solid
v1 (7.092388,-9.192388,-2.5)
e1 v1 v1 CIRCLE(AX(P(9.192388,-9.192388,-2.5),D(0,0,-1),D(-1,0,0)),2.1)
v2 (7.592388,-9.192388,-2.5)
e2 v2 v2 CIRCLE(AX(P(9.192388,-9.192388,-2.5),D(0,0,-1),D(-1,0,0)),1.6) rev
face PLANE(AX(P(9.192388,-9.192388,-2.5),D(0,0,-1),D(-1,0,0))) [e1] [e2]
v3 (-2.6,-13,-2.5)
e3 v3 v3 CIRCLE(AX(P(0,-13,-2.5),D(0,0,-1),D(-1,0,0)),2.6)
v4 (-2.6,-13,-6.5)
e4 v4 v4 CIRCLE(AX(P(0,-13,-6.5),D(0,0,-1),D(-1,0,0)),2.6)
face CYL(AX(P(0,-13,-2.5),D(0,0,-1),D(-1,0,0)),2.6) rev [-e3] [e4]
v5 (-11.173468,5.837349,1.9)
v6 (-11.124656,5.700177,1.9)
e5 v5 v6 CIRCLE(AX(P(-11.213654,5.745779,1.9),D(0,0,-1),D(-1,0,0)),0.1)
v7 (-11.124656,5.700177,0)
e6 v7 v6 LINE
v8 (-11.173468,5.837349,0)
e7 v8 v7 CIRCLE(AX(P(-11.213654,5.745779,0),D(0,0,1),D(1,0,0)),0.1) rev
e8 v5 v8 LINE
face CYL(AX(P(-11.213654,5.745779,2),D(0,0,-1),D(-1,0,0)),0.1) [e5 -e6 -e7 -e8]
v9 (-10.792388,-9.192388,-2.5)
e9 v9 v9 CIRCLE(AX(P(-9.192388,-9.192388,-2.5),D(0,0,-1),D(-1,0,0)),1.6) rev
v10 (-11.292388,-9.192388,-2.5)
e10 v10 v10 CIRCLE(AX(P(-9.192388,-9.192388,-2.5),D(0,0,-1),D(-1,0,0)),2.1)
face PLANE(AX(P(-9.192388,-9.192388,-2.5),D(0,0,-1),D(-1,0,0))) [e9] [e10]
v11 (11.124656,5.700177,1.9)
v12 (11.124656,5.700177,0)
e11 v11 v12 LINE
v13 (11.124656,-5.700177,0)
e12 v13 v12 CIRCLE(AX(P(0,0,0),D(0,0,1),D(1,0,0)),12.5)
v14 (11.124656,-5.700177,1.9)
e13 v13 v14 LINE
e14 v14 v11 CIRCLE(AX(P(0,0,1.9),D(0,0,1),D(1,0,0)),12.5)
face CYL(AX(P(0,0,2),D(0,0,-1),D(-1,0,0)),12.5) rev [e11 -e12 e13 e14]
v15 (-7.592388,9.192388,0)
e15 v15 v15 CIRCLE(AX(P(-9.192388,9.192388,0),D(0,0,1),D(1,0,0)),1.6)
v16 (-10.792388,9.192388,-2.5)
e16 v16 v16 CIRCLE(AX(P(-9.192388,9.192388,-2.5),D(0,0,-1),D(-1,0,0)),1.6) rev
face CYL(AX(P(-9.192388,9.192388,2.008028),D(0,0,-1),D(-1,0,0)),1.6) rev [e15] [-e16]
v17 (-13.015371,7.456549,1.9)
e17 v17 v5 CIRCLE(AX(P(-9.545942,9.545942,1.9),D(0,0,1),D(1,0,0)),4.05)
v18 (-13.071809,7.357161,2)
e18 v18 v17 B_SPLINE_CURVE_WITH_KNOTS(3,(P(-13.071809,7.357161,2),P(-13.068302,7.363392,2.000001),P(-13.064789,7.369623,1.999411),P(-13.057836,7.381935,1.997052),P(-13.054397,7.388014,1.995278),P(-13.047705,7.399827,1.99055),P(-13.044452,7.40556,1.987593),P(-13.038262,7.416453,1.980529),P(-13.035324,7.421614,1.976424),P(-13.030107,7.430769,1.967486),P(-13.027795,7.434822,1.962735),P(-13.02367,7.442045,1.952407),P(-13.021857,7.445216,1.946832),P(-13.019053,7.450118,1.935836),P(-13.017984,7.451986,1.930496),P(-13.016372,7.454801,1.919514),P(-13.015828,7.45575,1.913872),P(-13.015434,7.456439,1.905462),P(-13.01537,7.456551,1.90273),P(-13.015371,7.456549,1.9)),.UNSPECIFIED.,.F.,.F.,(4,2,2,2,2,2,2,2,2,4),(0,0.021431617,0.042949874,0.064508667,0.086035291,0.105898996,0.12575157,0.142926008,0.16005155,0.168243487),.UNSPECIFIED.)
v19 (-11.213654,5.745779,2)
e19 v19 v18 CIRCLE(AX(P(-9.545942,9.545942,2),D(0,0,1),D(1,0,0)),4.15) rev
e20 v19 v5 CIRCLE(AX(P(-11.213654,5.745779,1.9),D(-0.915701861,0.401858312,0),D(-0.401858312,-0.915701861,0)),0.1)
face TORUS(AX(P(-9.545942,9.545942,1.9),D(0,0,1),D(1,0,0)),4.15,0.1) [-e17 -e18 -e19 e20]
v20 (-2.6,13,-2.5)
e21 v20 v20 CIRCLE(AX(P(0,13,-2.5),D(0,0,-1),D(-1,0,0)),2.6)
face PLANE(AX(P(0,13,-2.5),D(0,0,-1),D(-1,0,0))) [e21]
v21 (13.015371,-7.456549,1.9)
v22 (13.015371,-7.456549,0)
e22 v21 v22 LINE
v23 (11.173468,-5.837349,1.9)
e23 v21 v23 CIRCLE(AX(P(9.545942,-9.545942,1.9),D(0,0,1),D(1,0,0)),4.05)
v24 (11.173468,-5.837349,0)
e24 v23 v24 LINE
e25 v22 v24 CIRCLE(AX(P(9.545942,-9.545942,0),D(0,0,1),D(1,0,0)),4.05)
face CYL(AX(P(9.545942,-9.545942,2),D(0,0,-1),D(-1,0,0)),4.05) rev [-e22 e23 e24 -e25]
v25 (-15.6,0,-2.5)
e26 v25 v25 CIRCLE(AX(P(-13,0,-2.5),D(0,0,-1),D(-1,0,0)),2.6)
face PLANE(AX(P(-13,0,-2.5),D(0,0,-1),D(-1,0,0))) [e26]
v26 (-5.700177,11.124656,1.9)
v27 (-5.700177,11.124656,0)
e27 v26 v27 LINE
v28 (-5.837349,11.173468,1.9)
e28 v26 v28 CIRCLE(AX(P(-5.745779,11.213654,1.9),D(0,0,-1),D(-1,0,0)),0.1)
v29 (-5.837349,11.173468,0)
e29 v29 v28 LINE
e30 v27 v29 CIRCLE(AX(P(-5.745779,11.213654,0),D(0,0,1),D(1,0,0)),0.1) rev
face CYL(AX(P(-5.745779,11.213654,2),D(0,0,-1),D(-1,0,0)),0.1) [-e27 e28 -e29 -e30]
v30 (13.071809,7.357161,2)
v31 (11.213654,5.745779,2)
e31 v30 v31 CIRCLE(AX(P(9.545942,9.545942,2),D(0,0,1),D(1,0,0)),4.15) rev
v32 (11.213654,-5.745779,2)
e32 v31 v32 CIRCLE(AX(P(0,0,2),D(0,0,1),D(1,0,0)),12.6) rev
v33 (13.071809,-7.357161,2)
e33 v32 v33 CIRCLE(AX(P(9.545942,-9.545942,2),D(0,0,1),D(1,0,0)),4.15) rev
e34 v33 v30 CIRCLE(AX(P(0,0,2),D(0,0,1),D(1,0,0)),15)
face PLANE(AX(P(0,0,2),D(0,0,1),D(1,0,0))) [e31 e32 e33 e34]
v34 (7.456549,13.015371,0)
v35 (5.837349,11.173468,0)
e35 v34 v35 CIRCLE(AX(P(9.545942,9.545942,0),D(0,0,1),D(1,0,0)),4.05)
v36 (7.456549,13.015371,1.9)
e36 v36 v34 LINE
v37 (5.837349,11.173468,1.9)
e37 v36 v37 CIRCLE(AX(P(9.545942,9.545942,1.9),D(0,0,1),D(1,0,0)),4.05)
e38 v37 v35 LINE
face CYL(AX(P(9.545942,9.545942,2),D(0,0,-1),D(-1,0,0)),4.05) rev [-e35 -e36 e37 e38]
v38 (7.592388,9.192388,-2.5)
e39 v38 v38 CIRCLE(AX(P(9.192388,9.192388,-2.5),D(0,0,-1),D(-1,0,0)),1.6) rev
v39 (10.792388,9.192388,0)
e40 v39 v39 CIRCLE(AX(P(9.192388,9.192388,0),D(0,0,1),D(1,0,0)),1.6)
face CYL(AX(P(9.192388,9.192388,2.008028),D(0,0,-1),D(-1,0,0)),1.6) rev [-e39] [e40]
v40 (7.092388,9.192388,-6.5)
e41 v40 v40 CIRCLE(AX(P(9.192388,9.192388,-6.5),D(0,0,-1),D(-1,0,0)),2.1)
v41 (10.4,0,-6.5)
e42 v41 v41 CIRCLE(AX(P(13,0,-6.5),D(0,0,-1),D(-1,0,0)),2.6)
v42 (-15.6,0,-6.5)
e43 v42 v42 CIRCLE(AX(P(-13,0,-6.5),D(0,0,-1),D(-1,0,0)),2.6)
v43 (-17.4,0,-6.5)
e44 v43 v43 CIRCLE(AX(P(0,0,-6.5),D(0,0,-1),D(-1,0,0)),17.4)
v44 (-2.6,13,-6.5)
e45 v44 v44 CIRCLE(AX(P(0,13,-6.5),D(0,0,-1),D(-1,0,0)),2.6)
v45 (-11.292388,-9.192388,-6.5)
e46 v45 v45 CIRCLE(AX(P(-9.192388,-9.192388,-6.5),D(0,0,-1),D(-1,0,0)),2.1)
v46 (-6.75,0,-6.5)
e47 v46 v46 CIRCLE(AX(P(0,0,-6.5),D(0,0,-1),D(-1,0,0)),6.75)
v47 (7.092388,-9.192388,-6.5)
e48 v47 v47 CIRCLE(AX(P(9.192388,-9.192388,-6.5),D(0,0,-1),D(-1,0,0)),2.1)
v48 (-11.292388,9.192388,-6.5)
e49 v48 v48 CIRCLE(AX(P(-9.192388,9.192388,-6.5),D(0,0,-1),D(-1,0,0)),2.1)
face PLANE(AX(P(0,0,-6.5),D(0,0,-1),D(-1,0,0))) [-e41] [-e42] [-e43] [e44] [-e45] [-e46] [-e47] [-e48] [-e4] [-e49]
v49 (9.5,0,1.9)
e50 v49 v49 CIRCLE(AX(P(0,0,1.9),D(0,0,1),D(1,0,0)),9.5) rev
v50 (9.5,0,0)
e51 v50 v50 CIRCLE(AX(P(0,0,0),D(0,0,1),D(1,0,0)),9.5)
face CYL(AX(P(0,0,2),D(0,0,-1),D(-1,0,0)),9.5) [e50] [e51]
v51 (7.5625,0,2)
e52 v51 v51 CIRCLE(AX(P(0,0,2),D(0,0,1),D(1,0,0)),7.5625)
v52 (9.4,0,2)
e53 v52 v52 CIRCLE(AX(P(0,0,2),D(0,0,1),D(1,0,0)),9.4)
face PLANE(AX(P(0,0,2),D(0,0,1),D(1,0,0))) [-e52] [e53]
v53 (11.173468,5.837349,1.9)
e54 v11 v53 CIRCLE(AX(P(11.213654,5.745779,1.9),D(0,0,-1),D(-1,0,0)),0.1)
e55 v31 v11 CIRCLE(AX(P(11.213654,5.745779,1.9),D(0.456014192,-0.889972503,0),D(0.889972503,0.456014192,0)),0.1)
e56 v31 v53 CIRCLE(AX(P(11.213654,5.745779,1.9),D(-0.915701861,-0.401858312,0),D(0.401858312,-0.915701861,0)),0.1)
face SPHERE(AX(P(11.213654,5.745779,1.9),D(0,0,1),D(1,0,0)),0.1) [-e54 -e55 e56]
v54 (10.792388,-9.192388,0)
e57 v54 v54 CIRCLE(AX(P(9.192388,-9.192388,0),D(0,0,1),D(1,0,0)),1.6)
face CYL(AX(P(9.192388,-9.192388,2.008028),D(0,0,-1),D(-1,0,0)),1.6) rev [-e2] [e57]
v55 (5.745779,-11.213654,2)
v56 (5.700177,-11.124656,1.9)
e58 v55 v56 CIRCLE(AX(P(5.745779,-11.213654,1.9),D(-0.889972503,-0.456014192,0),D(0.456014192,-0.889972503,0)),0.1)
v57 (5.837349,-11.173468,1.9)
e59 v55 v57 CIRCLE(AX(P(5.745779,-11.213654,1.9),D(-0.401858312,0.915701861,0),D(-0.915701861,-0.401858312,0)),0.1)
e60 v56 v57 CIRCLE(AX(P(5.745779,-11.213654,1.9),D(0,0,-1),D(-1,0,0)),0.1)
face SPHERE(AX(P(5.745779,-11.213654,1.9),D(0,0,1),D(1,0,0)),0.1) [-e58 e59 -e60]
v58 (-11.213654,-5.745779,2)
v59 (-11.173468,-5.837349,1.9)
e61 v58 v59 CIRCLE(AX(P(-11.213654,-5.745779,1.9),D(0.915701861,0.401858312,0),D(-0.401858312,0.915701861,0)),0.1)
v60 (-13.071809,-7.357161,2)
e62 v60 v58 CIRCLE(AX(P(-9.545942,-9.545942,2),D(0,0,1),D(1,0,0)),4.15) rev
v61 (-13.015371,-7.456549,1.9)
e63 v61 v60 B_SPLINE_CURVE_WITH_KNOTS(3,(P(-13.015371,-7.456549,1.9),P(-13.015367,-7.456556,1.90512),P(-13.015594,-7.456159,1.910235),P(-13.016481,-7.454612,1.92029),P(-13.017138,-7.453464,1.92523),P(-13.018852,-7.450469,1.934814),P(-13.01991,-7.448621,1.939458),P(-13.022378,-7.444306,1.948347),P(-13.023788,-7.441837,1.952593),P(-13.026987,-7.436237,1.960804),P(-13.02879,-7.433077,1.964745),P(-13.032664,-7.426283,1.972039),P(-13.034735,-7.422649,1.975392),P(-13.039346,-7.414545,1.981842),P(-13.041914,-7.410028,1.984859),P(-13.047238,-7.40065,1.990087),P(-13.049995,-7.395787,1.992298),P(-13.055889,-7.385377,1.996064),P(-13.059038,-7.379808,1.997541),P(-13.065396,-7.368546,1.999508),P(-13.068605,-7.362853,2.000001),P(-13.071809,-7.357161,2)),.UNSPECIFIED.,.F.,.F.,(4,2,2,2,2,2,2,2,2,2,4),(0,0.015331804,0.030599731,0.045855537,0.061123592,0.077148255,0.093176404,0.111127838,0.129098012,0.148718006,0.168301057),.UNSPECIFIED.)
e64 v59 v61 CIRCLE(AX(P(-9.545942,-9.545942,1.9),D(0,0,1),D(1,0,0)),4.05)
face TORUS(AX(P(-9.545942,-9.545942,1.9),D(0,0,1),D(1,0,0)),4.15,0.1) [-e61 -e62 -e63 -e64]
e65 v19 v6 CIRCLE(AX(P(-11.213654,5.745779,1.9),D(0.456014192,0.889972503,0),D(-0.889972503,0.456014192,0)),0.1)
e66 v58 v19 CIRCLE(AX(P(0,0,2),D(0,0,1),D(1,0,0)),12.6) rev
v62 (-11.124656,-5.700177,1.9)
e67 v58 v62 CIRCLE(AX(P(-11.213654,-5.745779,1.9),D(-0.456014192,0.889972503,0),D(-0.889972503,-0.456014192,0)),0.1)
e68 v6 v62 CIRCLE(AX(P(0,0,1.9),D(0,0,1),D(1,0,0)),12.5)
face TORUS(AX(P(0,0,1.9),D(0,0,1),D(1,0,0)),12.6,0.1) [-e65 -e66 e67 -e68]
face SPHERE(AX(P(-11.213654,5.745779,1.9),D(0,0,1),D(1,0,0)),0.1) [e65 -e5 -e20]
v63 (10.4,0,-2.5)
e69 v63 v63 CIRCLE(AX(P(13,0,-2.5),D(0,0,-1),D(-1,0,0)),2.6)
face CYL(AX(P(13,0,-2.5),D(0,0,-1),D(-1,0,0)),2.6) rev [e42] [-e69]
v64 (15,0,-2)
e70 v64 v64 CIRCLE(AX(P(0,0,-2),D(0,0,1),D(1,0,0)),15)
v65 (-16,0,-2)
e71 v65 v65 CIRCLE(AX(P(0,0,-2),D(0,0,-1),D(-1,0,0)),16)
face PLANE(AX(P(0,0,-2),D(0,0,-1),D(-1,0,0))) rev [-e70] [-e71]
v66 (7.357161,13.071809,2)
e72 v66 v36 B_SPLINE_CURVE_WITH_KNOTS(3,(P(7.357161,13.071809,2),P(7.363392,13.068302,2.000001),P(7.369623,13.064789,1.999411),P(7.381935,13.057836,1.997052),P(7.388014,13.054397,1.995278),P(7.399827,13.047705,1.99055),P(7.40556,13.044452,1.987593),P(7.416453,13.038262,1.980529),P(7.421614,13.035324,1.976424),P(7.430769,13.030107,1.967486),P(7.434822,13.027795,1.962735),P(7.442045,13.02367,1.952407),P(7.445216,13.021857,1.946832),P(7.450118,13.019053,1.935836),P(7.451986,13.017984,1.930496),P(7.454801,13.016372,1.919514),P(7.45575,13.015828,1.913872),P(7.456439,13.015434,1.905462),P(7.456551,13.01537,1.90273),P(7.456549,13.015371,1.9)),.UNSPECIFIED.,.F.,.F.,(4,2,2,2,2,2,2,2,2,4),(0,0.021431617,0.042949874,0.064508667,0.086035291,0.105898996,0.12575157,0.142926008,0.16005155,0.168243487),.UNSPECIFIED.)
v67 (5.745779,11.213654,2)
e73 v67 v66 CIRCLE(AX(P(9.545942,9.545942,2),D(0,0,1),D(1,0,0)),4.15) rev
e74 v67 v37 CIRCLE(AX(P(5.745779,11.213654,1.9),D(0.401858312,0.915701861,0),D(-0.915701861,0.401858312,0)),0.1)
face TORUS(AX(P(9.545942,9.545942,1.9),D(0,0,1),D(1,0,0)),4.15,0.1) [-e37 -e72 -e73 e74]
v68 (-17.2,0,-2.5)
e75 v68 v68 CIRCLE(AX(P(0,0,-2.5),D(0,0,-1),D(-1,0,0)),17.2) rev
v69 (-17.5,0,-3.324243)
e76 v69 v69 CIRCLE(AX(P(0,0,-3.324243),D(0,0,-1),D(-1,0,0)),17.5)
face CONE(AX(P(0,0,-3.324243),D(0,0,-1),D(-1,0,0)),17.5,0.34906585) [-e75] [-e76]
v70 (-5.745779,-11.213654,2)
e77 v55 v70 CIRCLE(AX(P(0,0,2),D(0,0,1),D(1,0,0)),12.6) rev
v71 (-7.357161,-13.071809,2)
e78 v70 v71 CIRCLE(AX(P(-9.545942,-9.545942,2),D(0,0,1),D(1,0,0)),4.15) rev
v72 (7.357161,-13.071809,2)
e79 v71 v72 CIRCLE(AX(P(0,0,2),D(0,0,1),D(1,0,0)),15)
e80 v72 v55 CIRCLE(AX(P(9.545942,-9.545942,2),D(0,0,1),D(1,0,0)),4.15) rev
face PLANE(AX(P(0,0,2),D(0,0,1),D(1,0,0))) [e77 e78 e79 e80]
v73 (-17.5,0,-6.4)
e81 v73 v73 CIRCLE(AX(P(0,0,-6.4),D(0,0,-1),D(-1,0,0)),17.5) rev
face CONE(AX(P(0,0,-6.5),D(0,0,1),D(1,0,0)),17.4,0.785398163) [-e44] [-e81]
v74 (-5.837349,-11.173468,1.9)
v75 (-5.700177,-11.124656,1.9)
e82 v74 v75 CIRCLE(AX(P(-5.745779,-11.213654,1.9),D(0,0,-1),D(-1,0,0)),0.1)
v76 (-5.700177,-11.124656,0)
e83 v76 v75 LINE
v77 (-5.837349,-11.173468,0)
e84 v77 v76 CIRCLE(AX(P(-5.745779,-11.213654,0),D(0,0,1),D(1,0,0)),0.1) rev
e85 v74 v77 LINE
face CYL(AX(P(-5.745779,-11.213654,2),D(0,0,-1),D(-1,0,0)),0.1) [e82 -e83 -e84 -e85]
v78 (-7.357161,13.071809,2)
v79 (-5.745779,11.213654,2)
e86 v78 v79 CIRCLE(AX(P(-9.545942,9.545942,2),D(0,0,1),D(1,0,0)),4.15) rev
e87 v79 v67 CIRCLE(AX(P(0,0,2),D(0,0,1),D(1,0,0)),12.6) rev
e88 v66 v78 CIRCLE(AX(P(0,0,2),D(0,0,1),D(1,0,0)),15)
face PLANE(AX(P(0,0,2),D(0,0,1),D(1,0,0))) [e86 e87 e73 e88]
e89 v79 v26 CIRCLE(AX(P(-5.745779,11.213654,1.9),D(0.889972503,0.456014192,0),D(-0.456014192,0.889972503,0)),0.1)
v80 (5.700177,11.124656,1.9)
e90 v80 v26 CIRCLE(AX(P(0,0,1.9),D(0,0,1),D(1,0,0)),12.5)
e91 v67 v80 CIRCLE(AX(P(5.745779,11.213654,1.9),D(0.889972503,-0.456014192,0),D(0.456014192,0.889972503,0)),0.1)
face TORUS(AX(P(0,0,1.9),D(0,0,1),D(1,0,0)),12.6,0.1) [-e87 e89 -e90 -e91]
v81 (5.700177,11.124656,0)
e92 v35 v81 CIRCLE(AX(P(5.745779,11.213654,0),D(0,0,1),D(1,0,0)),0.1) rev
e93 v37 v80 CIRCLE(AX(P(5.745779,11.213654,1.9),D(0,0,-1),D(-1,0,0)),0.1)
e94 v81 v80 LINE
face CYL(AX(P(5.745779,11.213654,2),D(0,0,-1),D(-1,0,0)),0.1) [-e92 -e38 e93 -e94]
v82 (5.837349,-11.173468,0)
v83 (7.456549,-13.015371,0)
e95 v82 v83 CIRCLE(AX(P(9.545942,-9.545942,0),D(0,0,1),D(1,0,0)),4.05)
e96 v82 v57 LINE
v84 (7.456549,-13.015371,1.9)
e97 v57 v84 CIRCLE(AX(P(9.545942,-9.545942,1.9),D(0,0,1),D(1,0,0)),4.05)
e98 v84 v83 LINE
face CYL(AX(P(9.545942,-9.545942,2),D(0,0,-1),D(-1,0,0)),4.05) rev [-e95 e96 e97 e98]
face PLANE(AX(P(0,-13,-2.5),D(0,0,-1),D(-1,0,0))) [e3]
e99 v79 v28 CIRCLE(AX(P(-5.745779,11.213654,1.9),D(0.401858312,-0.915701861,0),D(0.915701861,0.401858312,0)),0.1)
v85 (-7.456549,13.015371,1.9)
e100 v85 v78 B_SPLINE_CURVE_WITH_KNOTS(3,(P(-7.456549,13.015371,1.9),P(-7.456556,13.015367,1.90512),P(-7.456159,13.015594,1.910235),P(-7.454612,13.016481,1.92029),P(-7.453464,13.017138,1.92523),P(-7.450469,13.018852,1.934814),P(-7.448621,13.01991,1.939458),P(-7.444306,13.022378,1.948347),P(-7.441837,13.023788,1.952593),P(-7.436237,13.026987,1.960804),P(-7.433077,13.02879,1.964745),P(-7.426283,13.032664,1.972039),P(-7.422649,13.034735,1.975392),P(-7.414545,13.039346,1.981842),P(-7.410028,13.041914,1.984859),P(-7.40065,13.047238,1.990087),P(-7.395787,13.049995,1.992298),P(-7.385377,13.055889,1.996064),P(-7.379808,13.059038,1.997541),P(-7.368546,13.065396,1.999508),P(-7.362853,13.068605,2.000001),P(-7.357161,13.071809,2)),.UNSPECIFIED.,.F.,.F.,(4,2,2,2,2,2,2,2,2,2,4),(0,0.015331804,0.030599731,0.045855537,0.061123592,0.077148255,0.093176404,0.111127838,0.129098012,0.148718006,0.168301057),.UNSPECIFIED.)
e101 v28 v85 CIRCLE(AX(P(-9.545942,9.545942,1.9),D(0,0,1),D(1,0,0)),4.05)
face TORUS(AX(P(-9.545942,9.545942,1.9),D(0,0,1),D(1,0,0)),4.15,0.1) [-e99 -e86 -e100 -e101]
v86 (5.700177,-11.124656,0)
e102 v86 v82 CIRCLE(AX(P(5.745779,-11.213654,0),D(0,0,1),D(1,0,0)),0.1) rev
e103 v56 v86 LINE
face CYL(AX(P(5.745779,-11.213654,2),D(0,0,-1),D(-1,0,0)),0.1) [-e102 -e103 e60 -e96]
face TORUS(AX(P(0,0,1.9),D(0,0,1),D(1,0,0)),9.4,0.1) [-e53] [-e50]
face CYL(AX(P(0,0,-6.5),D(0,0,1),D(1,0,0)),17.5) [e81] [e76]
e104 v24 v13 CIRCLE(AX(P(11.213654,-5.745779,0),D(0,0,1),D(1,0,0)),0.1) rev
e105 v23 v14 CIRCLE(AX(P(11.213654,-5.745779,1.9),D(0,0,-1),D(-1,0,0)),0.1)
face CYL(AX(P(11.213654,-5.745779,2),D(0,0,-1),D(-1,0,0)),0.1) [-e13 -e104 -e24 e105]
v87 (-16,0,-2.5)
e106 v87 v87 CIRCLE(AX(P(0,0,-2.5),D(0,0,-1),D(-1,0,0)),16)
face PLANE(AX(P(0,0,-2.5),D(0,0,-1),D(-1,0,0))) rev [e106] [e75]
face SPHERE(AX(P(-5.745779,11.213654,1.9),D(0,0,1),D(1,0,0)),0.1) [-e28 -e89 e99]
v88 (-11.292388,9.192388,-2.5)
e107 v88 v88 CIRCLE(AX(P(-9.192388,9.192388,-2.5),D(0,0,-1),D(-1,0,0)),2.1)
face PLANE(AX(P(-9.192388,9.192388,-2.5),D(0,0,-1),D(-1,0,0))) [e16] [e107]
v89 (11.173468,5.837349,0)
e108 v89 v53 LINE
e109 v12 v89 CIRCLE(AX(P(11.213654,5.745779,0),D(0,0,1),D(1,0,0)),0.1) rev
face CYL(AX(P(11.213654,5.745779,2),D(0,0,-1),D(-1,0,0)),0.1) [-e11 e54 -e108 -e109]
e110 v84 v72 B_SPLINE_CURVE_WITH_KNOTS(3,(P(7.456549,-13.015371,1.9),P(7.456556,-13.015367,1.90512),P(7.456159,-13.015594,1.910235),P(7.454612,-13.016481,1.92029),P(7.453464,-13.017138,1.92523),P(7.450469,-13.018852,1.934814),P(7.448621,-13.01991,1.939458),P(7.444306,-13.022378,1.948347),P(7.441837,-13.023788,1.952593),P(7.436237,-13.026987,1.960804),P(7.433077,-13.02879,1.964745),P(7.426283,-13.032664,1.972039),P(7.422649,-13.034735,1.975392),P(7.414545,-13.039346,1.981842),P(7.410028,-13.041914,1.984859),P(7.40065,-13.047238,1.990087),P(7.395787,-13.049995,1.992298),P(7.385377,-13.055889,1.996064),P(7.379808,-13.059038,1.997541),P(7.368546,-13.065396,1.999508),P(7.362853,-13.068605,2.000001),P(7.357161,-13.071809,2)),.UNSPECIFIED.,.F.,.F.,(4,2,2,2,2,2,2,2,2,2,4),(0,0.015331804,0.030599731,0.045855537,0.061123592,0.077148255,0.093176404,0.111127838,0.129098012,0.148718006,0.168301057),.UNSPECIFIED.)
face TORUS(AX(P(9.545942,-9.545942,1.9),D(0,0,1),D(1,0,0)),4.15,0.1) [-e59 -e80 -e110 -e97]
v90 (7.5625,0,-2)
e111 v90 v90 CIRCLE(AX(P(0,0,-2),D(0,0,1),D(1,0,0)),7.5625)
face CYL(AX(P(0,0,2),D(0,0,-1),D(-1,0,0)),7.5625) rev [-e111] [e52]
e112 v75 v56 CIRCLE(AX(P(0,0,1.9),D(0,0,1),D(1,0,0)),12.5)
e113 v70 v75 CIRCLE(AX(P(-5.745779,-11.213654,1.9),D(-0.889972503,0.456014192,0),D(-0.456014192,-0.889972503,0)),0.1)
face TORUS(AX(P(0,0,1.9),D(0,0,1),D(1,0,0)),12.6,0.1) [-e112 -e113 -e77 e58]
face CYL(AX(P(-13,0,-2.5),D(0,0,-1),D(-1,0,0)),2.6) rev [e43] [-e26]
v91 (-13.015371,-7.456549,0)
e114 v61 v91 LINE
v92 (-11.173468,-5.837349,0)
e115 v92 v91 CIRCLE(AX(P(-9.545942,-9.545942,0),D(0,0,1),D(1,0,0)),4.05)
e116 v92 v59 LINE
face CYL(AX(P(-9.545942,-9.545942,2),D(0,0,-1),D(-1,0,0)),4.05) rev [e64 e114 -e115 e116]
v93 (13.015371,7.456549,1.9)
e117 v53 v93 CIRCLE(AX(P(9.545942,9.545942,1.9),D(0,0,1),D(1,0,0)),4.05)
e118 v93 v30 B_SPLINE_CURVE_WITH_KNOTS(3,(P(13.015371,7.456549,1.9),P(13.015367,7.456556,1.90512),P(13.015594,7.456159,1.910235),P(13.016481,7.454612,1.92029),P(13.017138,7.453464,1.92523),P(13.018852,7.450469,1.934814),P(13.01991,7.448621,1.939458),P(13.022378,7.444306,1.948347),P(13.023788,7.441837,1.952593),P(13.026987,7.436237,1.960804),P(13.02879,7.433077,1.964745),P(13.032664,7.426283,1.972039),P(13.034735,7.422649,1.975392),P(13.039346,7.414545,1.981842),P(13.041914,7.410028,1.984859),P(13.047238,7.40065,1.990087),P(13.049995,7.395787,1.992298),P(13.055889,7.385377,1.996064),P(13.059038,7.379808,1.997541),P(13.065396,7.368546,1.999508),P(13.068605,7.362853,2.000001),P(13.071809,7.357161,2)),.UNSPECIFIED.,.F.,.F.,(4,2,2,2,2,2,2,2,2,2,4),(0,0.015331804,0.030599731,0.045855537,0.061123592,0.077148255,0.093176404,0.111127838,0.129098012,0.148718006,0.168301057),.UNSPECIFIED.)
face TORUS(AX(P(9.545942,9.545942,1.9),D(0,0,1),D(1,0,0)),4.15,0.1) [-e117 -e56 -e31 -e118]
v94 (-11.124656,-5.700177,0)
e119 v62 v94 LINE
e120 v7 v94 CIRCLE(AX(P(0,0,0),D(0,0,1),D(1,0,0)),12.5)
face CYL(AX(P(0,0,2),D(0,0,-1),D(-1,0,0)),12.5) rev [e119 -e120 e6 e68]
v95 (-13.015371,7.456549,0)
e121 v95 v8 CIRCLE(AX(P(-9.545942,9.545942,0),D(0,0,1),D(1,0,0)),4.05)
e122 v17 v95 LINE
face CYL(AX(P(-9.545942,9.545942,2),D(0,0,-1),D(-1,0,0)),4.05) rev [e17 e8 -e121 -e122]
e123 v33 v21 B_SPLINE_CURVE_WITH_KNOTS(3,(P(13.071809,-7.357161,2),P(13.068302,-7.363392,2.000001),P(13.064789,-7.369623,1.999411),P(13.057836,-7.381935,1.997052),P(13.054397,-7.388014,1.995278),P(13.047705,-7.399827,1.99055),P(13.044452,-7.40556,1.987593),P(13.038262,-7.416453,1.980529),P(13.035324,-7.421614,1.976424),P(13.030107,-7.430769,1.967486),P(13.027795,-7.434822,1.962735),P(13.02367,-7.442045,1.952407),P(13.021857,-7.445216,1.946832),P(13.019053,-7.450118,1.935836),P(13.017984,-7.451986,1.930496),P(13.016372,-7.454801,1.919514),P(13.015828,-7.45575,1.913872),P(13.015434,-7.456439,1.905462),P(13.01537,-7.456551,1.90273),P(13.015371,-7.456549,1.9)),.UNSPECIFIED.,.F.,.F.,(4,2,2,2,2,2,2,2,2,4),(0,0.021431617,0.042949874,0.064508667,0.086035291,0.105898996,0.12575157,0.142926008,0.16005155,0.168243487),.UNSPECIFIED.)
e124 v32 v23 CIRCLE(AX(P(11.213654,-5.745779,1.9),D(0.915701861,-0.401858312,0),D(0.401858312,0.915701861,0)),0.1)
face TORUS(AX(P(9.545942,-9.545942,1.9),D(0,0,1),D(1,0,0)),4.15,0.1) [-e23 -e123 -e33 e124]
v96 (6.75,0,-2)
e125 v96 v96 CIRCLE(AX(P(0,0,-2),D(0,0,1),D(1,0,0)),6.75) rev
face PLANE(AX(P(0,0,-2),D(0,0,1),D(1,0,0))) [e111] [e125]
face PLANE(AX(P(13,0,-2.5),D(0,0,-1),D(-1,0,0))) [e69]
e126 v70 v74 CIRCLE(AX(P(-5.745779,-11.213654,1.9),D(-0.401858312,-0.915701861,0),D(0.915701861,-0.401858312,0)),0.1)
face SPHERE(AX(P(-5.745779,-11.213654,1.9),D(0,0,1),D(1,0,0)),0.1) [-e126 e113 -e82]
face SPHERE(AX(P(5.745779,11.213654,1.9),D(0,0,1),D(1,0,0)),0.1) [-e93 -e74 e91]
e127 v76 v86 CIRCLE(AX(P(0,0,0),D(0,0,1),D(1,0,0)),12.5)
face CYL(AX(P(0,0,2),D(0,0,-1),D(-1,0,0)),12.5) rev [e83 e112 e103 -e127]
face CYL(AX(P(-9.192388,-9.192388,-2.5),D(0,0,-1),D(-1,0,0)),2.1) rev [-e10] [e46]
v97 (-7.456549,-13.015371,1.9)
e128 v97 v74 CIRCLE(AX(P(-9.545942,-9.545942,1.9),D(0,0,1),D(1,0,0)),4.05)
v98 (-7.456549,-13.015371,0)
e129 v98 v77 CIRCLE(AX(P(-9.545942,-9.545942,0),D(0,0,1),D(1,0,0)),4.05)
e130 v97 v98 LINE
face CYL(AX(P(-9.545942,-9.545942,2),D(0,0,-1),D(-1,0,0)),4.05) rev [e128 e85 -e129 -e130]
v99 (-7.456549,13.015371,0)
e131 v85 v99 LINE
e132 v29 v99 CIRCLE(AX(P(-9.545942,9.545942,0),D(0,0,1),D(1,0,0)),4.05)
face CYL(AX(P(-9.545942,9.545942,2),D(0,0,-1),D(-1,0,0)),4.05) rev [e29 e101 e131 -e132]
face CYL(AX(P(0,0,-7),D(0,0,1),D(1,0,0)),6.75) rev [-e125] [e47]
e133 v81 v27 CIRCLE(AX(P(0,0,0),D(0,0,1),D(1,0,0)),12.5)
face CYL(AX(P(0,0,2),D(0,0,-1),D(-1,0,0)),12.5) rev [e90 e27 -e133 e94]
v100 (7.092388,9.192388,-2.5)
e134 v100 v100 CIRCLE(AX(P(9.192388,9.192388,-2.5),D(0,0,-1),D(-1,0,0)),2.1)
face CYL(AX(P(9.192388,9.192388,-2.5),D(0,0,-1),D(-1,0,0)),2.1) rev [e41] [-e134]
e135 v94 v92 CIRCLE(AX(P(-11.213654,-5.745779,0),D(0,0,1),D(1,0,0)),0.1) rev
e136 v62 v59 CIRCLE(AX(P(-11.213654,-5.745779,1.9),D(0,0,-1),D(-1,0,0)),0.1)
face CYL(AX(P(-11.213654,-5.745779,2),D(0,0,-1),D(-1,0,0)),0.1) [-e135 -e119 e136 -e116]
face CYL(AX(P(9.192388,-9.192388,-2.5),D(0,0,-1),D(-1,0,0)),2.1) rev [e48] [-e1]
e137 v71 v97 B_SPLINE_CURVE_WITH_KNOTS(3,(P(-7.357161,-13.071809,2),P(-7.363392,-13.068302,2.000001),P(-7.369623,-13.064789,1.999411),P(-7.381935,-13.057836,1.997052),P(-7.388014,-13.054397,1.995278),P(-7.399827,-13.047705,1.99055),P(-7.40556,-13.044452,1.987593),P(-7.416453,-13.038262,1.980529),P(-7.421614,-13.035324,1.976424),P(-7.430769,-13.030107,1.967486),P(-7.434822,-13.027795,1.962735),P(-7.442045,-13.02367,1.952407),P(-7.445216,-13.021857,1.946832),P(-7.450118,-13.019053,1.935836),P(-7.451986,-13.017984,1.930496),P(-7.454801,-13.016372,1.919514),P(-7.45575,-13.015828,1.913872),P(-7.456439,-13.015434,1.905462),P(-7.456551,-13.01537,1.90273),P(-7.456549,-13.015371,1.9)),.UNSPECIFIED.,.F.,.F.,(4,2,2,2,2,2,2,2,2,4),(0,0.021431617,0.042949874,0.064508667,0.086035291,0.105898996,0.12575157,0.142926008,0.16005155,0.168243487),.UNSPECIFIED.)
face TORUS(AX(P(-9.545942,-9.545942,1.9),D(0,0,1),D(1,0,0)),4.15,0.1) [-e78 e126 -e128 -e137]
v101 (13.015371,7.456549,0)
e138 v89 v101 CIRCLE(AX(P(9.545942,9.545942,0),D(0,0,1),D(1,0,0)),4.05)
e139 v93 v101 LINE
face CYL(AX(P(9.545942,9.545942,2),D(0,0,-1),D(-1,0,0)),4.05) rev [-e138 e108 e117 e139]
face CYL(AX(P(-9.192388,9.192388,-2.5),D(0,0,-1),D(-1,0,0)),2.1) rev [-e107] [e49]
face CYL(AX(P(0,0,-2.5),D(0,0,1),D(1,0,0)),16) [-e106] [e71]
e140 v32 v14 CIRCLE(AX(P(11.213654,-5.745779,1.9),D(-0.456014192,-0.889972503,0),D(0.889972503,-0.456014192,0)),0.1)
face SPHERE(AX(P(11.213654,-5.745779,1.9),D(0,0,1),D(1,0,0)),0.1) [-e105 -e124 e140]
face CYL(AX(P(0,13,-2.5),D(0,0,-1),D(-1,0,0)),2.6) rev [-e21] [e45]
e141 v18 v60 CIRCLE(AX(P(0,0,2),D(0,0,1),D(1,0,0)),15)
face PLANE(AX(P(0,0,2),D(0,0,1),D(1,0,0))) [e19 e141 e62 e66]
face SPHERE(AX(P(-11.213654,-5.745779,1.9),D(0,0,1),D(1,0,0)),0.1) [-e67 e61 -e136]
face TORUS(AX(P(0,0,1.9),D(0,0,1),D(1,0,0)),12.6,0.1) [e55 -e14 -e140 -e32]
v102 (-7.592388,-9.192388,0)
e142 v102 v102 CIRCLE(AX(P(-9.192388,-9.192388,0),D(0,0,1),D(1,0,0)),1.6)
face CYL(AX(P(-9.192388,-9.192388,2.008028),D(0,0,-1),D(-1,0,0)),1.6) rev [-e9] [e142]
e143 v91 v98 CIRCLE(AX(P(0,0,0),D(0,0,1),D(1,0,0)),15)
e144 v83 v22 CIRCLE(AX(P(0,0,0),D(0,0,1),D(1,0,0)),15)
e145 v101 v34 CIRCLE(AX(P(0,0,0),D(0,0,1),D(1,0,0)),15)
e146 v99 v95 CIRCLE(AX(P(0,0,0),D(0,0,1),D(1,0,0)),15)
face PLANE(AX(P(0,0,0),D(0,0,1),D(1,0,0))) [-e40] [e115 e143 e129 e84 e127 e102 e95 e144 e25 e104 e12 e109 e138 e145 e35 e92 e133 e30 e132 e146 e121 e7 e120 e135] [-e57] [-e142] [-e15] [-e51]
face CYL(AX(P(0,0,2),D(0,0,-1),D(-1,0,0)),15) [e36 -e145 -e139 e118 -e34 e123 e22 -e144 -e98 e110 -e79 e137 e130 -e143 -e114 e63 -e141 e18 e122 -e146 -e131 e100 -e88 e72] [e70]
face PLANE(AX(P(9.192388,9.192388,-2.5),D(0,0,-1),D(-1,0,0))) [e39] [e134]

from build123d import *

# Parameters (mm, degrees)
BOSS_EXTRUDE1_DEPTH     = 2
BOSS_EXTRUDE1_2_DEPTH   = 2
BOSS_EXTRUDE1_3_DEPTH   = 2
BOSS_EXTRUDE1_4_DEPTH   = 2
SKETCH1_R               = 9.5
SKETCH1_R_2             = 7.5625
BOSS_EXTRUDE1_5_DEPTH   = 2
BOSS_EXTRUDE2_START     = -2
SKETCH2_R               = 15
BOSS_EXTRUDE2_DEPTH     = 2
FILLET1_R               = 0.1
FILLET2_R               = 0.1
SKETCH4_R               = 16
BOSS_EXTRUDE3_DEPTH     = 0.5
SKETCH5_R               = 17.5
BOSS_EXTRUDE4_DEPTH     = 4
CUT_EXTRUDE2_DEPTH      = 26.154522456
CUT_EXTRUDE2_DEPTH_BACK = 26.154522456
SKETCH3_R               = 1.6
SKETCH6_R               = 2.1
CUT_EXTRUDE3_DEPTH      = 4
SKETCH7_R               = 2.6
CUT_EXTRUDE4_DEPTH      = 4
SKETCH8_R               = 6.75
MIDDLE_CUTOUT_DEPTH     = 7
CHAMFER1_SIZE           = 0.1
CUT_EXTRUDE6_START      = -2
SKETCH9_R               = 7.5625
CUT_EXTRUDE6_DEPTH      = 2
CHAMFER2_SIZE           = 0.3
CHAMFER2_SIZE2          = 0.824243226


with BuildPart() as part:
    # Sketch1 → Boss-Extrude1 (new body)
    with BuildSketch(Plane.XY):
        with BuildLine():
            ThreePointArc((5.795745748, 11.075167323), (6.469207051, 12.179609111), (7.456549067, 13.01537076))
            ThreePointArc((7.456549067, 13.01537076), (0, 15), (-7.456549067, 13.01537076))
            ThreePointArc((-7.456549067, 13.01537076), (-6.469207051, 12.179609111), (-5.795745748, 11.075167323))
            ThreePointArc((-5.795745748, 11.075167323), (0, 12.5), (5.795745748, 11.075167323))
        make_face()
    extrude(amount=BOSS_EXTRUDE1_DEPTH)



with BuildPart() as body_2:
    # Sketch1 → Boss-Extrude1 2 (new body)
    with BuildSketch(Plane.XY):
        with BuildLine():
            ThreePointArc((13.01537076, -7.456549067), (14.495353762, -3.858071967), (15, 0))
            ThreePointArc((15, 0), (14.495353762, 3.858071967), (13.01537076, 7.456549067))
            ThreePointArc((13.01537076, 7.456549067), (12.179609111, 6.469207051), (11.075167323, 5.795745748))
            ThreePointArc((11.075167323, 5.795745748), (12.5, 0), (11.075167323, -5.795745748))
            ThreePointArc((11.075167323, -5.795745748), (12.179609111, -6.469207051), (13.01537076, -7.456549067))
        make_face()
    extrude(amount=BOSS_EXTRUDE1_2_DEPTH)


with BuildPart() as body_3:
    # Sketch1 → Boss-Extrude1 3 (new body)
    with BuildSketch(Plane.XY):
        with BuildLine():
            ThreePointArc((-7.456549067, -13.01537076), (0, -15), (7.456549067, -13.01537076))
            ThreePointArc((7.456549067, -13.01537076), (6.469207051, -12.179609111), (5.795745748, -11.075167323))
            ThreePointArc((5.795745748, -11.075167323), (0, -12.5), (-5.795745748, -11.075167323))
            ThreePointArc((-5.795745748, -11.075167323), (-6.469207051, -12.179609111), (-7.456549067, -13.01537076))
        make_face()
    extrude(amount=BOSS_EXTRUDE1_3_DEPTH)


with BuildPart() as body_4:
    # Sketch1 → Boss-Extrude1 4 (new body)
    with BuildSketch(Plane.XY):
        with BuildLine():
            ThreePointArc((-11.075167323, 5.795745748), (-12.179609111, 6.469207051), (-13.01537076, 7.456549067))
            ThreePointArc((-13.01537076, 7.456549067), (-15, 0), (-13.01537076, -7.456549067))
            ThreePointArc((-13.01537076, -7.456549067), (-12.179609111, -6.469207051), (-11.075167323, -5.795745748))
            ThreePointArc((-11.075167323, -5.795745748), (-12.5, 0), (-11.075167323, 5.795745748))
        make_face()
    extrude(amount=BOSS_EXTRUDE1_4_DEPTH)


with BuildPart() as body_5:
    # Sketch1 → Boss-Extrude1 5 (new body)
    with BuildSketch(Plane.XY):
        Circle(SKETCH1_R)
        Circle(SKETCH1_R_2, mode=Mode.SUBTRACT)
    extrude(amount=BOSS_EXTRUDE1_5_DEPTH)


with BuildPart() as part_1:
    add(part.part)

    add(body_2.part)  # Boss-Extrude2 merges body 2

    add(body_3.part)  # Boss-Extrude2 merges body 3

    add(body_4.part)  # Boss-Extrude2 merges body 4

    add(body_5.part)  # Boss-Extrude2 merges body 5
    # Sketch2 → Boss-Extrude2 (add)
    with BuildSketch(Plane.XY.offset(BOSS_EXTRUDE2_START)):
        with Locations(Location((0, 0, 0), (0, 0, 150.191461703))):
            Circle(SKETCH2_R)
    extrude(amount=BOSS_EXTRUDE2_DEPTH)

    # Fillet1
    fillet1_edges = [part_1.edges().sort_by_distance(p)[0] for p in [
        (11.075167323, 5.795745748, 1),
        (11.075167323, -5.795745748, 1),
        (5.795745748, -11.075167323, 1),
        (-5.795745748, -11.075167323, 1),
        (-11.075167323, -5.795745748, 1),
        (-11.075167323, 5.795745748, 1),
        (5.795745748, 11.075167323, 1),
        (-5.795745748, 11.075167323, 1),
    ]]
    fillet(fillet1_edges, radius=FILLET1_R)

    # Fillet2
    fillet2_edges = [part_1.edges().sort_by_distance(p)[0] for p in [
        (6.504180663, 12.219925602, 2),
        (12.219925602, -6.504180663, 2),
        (-6.504180663, -12.219925602, 2),
        (-12.219925602, 6.504180663, 2),
        (-9.5, 0, 2),
        (0, -12.5, 2),
        (6.504180663, -12.219925602, 2),
        (5.779303749, -11.119440592, 2),
        (-5.779303749, -11.119440592, 2),
        (12.5, 0, 2),
        (12.219925602, 6.504180663, 2),
        (11.119440592, 5.779303749, 2),
        (11.119440592, -5.779303749, 2),
        (0, 12.5, 2),
        (-6.504180663, 12.219925602, 2),
        (-5.779303749, 11.119440592, 2),
        (5.779303749, 11.119440592, 2),
        (-12.5, 0, 2),
        (-12.219925602, -6.504180663, 2),
        (-11.119440592, -5.779303749, 2),
        (-11.119440592, 5.779303749, 2),
    ]]
    fillet(fillet2_edges, radius=FILLET2_R - 0.0001)  # a hair under: the kernel refuses the full size

    # Sketch4 → Boss-Extrude3 (add)
    with BuildSketch(Plane(origin=(0, 0, -2), x_dir=(-1, 0, 0), z_dir=(0, 0, -1))):
        Circle(SKETCH4_R)
    extrude(amount=BOSS_EXTRUDE3_DEPTH)

    # Sketch5 → Boss-Extrude4 (add)
    with BuildSketch(Plane(origin=(0, 0, -2.5), x_dir=(-1, 0, 0), z_dir=(0, 0, -1))):
        Circle(SKETCH5_R)
    extrude(amount=BOSS_EXTRUDE4_DEPTH)

    # Sketch3 → Cut-Extrude2 (cut, two sides: drawn at the far end of the back side and taken through both)
    with BuildSketch(Plane(origin=(0, 0, -2), x_dir=(-1, 0, 0), z_dir=(0, 0, -1)).offset(-CUT_EXTRUDE2_DEPTH_BACK)):
        with Locations((-9.192388155, 9.192388155)):
            Circle(SKETCH3_R)
        with Locations((9.192388155, 9.192388155)):
            Circle(SKETCH3_R)
        with Locations((9.192388155, -9.192388155)):
            Circle(SKETCH3_R)
        with Locations((-9.192388155, -9.192388155)):
            Circle(SKETCH3_R)
    extrude(amount=CUT_EXTRUDE2_DEPTH + CUT_EXTRUDE2_DEPTH_BACK, mode=Mode.SUBTRACT)

    # Sketch6 → Cut-Extrude3 (cut)
    with BuildSketch(Plane(origin=(0, 0, -6.5), x_dir=(-1, 0, 0), z_dir=(0, 0, -1))):
        with Locations((-9.192388155, 9.192388155)):
            Circle(SKETCH6_R)
        with Locations((9.192388155, 9.192388155)):
            Circle(SKETCH6_R)
        with Locations((9.192388155, -9.192388155)):
            Circle(SKETCH6_R)
        with Locations((-9.192388155, -9.192388155)):
            Circle(SKETCH6_R)
    extrude(amount=-CUT_EXTRUDE3_DEPTH, mode=Mode.SUBTRACT)

    # Sketch7 → Cut-Extrude4 (cut)
    with BuildSketch(Plane(origin=(0, 0, -6.5), x_dir=(-1, 0, 0), z_dir=(0, 0, -1))):
        with Locations((0, 13)):
            Circle(SKETCH7_R)
        with Locations((13, 0)):
            Circle(SKETCH7_R)
        with Locations((0, -13)):
            Circle(SKETCH7_R)
        with Locations((-13, 0)):
            Circle(SKETCH7_R)
    extrude(amount=-CUT_EXTRUDE4_DEPTH, mode=Mode.SUBTRACT)

    # Sketch8 → Middle Cutout (cut)
    with BuildSketch(Plane.XY):
        Circle(SKETCH8_R)
    extrude(amount=-MIDDLE_CUTOUT_DEPTH, mode=Mode.SUBTRACT)

    # Chamfer1
    chamfer1_edges = [part_1.edges().sort_by_distance(p)[0] for p in [
        (17.5, 0, -6.5),
    ]]
    chamfer(chamfer1_edges, length=CHAMFER1_SIZE)

    # Sketch9 → Cut-Extrude6 (cut)
    with BuildSketch(Plane.XY.offset(CUT_EXTRUDE6_START)):
        Circle(SKETCH9_R)
    extrude(amount=CUT_EXTRUDE6_DEPTH, mode=Mode.SUBTRACT)

    # Chamfer2
    chamfer2_edges = [part_1.edges().sort_by_distance(p)[0] for p in [
        (17.5, 0, -2.5),
    ]]
    chamfer2_side = [part_1.faces().sort_by_distance(p)[0] for p in [
        (17.005025253, 0, -2.5),
    ]]
    chamfer(chamfer2_edges, length=CHAMFER2_SIZE, length2=CHAMFER2_SIZE2, reference=chamfer2_side[0])


solid = part_1.part
